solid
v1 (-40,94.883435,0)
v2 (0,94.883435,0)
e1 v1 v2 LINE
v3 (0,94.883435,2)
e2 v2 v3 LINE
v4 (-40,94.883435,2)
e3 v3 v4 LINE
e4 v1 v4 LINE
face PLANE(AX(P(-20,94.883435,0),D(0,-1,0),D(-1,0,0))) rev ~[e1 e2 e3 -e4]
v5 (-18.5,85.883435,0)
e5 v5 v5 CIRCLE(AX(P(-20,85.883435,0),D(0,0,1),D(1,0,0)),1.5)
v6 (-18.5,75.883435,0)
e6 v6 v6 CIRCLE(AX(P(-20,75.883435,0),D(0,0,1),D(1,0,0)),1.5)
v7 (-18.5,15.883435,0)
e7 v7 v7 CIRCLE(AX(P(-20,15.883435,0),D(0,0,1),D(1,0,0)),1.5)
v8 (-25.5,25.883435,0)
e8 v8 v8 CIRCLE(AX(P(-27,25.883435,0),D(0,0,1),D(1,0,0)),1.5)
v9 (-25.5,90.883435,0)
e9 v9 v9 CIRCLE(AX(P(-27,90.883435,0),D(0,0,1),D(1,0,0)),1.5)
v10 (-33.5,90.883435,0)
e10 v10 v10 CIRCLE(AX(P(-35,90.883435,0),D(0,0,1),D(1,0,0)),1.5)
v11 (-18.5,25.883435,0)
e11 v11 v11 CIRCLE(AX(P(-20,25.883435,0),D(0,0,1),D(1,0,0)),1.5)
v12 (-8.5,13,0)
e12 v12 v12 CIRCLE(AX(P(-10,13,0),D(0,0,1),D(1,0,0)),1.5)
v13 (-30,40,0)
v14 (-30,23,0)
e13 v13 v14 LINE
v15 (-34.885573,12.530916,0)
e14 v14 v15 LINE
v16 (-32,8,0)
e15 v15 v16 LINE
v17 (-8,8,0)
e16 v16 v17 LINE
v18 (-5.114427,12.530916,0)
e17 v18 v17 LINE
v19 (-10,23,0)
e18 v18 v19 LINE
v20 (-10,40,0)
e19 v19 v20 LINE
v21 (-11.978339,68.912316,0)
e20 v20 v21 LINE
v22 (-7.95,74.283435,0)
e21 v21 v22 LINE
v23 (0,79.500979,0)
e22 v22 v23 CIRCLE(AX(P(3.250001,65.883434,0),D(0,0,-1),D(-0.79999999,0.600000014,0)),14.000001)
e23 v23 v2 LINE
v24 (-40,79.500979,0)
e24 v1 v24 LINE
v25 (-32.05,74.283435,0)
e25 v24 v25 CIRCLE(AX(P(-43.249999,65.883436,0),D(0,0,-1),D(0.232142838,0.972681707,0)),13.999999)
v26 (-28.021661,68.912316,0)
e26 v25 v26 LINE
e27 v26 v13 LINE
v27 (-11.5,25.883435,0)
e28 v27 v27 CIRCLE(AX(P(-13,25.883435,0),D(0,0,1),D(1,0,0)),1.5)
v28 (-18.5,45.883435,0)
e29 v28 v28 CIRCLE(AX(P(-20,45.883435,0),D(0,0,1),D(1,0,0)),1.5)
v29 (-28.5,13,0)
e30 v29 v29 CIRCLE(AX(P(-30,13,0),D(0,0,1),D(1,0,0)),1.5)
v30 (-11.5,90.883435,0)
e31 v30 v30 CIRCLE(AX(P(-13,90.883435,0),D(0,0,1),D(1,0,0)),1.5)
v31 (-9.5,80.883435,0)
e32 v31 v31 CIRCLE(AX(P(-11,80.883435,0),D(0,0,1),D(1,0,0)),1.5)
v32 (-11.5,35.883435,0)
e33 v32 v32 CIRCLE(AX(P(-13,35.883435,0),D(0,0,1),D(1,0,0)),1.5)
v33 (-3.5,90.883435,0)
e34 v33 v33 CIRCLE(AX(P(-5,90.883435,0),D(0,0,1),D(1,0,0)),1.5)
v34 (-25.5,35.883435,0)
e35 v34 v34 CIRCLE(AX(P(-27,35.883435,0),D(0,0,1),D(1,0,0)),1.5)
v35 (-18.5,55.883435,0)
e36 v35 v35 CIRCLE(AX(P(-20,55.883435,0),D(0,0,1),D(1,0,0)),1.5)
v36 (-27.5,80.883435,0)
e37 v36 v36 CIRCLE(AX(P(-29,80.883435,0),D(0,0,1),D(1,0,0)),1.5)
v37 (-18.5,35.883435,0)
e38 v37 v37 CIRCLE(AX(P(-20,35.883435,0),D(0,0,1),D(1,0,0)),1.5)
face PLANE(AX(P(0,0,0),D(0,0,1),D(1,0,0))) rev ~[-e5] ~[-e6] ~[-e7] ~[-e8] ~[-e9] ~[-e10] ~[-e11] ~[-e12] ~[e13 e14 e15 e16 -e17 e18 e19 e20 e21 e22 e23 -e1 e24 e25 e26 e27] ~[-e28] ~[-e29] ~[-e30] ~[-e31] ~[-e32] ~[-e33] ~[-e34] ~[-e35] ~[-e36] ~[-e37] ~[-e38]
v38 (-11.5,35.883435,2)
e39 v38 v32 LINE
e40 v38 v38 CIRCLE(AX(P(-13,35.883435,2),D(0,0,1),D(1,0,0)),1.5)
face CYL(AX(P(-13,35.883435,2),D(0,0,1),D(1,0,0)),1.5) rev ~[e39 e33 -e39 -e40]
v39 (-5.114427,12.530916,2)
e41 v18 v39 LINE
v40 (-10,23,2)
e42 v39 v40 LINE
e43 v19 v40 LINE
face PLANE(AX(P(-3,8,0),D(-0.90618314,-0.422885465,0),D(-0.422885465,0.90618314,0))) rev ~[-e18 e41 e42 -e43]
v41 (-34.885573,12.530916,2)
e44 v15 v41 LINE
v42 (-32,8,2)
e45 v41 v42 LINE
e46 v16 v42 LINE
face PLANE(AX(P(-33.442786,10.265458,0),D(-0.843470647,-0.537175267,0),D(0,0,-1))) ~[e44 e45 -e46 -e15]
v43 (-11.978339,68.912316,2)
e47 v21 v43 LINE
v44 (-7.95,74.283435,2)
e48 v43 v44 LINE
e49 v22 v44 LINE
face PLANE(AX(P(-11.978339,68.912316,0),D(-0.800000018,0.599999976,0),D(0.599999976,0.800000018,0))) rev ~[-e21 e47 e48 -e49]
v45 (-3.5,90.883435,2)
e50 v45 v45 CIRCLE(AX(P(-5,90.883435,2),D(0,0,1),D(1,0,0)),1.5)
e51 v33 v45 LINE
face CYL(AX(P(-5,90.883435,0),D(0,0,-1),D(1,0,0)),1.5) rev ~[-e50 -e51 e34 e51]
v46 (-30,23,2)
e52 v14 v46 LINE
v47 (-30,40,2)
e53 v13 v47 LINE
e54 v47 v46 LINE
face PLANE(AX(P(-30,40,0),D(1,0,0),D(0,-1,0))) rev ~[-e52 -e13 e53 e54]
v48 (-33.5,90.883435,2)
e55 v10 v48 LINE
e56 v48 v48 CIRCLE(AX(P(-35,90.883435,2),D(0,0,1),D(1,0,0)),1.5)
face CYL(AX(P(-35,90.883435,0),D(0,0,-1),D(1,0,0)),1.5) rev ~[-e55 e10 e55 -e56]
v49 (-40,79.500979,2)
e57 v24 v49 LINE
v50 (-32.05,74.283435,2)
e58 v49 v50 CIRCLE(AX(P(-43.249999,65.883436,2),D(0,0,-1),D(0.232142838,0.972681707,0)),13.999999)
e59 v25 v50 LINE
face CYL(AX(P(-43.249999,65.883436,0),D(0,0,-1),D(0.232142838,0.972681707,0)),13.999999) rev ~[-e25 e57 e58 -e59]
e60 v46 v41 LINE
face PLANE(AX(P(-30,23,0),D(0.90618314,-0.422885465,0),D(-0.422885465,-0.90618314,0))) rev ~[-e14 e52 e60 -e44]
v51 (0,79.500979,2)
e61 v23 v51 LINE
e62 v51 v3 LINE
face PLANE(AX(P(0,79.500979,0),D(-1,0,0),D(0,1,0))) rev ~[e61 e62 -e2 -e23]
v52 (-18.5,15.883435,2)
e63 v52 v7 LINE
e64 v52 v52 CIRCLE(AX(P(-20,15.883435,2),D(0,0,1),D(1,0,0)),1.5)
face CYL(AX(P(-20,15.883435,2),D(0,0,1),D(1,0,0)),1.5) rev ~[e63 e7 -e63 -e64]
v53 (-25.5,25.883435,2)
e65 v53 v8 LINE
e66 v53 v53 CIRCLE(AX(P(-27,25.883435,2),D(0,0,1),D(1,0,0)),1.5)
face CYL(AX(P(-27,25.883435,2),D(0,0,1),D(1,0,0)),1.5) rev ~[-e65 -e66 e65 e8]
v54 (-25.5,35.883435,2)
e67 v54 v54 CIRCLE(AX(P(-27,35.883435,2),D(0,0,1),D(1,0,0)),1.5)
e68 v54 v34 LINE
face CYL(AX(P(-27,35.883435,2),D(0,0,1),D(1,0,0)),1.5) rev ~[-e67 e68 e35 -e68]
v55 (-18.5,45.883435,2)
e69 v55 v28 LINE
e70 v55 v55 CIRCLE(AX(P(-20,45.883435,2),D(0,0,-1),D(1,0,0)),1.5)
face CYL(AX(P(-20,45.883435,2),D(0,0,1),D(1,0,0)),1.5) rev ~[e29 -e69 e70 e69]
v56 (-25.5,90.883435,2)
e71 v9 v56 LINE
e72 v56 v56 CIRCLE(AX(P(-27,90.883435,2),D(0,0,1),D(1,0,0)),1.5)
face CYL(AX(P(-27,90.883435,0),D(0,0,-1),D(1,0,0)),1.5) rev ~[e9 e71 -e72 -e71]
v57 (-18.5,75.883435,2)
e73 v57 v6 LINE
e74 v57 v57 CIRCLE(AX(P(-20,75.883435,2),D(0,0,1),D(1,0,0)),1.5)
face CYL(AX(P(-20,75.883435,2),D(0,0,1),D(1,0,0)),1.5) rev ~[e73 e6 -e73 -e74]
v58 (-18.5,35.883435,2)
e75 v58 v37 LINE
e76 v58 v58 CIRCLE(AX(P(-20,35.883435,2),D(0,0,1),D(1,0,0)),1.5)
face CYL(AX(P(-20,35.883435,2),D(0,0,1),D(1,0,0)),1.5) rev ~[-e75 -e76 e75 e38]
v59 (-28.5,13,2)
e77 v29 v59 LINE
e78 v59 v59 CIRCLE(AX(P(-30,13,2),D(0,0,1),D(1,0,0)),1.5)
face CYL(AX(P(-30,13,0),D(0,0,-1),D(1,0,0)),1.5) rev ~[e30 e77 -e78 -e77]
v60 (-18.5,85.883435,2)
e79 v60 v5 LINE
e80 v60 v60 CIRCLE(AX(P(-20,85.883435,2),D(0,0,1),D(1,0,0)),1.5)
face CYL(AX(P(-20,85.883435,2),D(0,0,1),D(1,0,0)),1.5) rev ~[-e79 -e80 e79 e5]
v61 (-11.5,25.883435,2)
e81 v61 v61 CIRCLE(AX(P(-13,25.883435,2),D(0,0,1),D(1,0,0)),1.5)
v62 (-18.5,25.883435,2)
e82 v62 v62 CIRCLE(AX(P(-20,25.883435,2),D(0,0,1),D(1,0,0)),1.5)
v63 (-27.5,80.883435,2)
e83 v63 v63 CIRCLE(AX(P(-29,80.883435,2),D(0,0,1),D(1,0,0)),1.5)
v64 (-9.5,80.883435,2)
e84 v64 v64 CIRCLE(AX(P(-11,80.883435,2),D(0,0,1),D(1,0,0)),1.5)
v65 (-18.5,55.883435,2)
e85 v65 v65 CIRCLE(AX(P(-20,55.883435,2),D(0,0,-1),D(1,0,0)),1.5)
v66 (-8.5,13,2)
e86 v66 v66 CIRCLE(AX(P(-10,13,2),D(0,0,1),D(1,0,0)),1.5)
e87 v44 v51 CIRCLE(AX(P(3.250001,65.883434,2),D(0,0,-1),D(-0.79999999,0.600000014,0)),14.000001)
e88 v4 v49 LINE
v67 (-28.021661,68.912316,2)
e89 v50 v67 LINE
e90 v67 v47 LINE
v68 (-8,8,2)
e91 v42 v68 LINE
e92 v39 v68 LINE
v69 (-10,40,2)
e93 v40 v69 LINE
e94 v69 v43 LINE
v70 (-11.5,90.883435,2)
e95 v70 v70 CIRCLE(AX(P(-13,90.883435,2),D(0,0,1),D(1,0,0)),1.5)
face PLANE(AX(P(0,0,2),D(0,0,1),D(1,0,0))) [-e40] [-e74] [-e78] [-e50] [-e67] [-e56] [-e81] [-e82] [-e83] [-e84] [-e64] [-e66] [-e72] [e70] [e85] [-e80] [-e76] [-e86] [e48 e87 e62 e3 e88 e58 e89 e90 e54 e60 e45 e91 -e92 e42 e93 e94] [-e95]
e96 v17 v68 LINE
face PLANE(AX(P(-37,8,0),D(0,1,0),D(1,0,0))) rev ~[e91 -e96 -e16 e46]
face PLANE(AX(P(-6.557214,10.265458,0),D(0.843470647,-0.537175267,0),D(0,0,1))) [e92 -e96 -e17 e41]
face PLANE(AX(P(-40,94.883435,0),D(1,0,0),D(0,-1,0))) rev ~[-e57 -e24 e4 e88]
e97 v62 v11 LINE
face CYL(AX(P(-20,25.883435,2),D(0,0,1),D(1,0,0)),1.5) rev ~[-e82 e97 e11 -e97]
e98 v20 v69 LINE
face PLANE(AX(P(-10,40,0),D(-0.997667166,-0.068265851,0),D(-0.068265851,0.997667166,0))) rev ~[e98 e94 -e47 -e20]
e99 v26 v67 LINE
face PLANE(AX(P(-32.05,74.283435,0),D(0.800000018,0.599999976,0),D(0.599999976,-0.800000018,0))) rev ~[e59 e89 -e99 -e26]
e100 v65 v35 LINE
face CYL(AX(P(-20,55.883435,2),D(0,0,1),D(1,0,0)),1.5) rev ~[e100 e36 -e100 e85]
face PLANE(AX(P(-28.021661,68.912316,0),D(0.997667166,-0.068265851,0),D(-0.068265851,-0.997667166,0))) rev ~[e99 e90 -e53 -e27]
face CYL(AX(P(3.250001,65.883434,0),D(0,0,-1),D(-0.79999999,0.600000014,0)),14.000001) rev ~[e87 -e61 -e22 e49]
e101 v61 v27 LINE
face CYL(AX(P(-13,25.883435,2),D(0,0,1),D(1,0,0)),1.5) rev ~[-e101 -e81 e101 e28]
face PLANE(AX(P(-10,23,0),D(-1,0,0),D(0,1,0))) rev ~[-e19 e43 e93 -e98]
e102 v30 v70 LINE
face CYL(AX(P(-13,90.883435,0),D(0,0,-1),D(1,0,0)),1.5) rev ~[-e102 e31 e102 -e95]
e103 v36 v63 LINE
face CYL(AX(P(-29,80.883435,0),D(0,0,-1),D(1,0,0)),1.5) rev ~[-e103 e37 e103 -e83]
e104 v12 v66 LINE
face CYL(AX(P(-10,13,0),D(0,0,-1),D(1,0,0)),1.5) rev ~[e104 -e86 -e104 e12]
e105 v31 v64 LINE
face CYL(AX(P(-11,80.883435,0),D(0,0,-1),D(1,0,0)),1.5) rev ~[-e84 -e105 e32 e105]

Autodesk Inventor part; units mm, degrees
ref_plane "YZ Plane" through (0, 0, 0) normal (1, 0, 0) x (0, 1, 0)
ref_plane "XZ Plane" through (0, 0, 0) normal (0, 1, 0) x (-1, 0, 0)
ref_plane "XY Plane" through (0, 0, 0) normal (0, 0, 1) x (1, 0, 0)
sketch "Sketch1" plane through (0, 0, 0) normal (0, 0, 1) x (1, 0, 0)
  circle A0 centre (-34, 4) radius 1.5
  circle A1 centre (-30, 13) radius 1.5
  circle A2 centre (-27, 4) radius 1.5
  line L0 (-30, 23) -> (-30, 40)
  line L1 (-39.076923, 9.384615) -> (-30, 23)
  line L2 (-40, 0) -> (-40, 8)
  line L3 (-40, 0) -> (-20, 0)
  line L4 (-20, 0) -> (-20, 40)
  line L5 (-20, 40) -> (-30, 40)
  circle A3 centre (-6, 4) radius 1.5
  circle A4 centre (-10, 13) radius 1.5
  circle A5 centre (-13, 4) radius 1.5
  line L6 (-10, 23) -> (-10, 40)
  line L7 (-20, 40) -> (-10, 40)
  line L8 (-20, 0) -> (-20, 40)
  line L9 (0, 0) -> (-20, 0)
  line L10 (0, 0) -> (0, 8)
  line L11 (-0.923077, 9.384615) -> (-10, 23)
  line L12 (-3, 8) -> (-37, 8)
  circle A6 centre (-29, 80.883435) radius 1.5
  circle A7 centre (-27, 90.883435) radius 1.5
  circle A8 centre (-35, 90.883435) radius 1.5
  line L13 (-40, 79.500979) -> (-40, 94.883435)
  arc A9 (-32.05, 74.283435) -> (-40, 79.500979) centre (-43.25, 65.883435) ccw
  line L14 (-28.021661, 68.912316) -> (-32.05, 74.283435)
  line L15 (-20, 68.912316) -> (-28.021661, 68.912316)
  line L16 (-20, 94.883435) -> (-20, 68.912316)
  line L17 (-40, 94.883435) -> (-20, 94.883435)
  circle A10 centre (-11, 80.883435) radius 1.5
  circle A11 centre (-13, 90.883435) radius 1.5
  circle A12 centre (-5, 90.883435) radius 1.5
  line L18 (0, 79.500979) -> (0, 94.883435)
  line L19 (0, 94.883435) -> (-20, 94.883435)
  line L20 (-20, 94.883435) -> (-20, 68.912316)
  line L21 (-20, 68.912316) -> (-11.978339, 68.912316)
  line L22 (-11.978339, 68.912316) -> (-7.95, 74.283435)
  arc A13 (0, 79.500979) -> (-7.95, 74.283435) centre (3.25, 65.883435) ccw
  line L23 (-10, 40) -> (-11.978339, 68.912316)
  line L24 (-28.021661, 68.912316) -> (-30, 40)
sketch "Sketch1 outline for Extrusion1" plane through (0, 0, 0) normal (0, 0, 1) x (1, 0, 0)
  line L0 (-37, 8) -> (-3, 8)
  line L1 (-30, 23) -> (-37, 8)
  line L2 (-3, 8) -> (-10, 23)
  line L3 (-30, 40) -> (-30, 23)
  line L4 (-10, 23) -> (-10, 40)
  line L5 (-28.021661, 68.912316) -> (-30, 40)
  line L6 (-10, 40) -> (-11.978339, 68.912316)
  line L7 (-32.05, 74.283435) -> (-28.021661, 68.912316)
  line L8 (-11.978339, 68.912316) -> (-7.95, 74.283435)
  arc A0 (-40, 79.500979) -> (-32.05, 74.283435) centre (-43.25, 65.883435) cw
  arc A1 (-7.95, 74.283435) -> (0, 79.500979) centre (3.25, 65.883435) cw
  line L9 (-40, 94.883435) -> (-40, 79.500979)
  line L10 (0, 79.500979) -> (0, 94.883435)
  line L11 (-20, 94.883435) -> (-40, 94.883435)
  line L12 (0, 94.883435) -> (-20, 94.883435)
  circle A2 centre (-30, 13) radius 1.5
  circle A3 centre (-10, 13) radius 1.5
  circle A4 centre (-29, 80.883435) radius 1.5
  circle A5 centre (-35, 90.883435) radius 1.5
  circle A6 centre (-27, 90.883435) radius 1.5
  circle A7 centre (-13, 90.883435) radius 1.5
  circle A8 centre (-11, 80.883435) radius 1.5
  circle A9 centre (-5, 90.883435) radius 1.5
extrude "Extrusion1" add sketch "Sketch1 outline for Extrusion1" along normal blind 2
chamfer "Chamfer1" distance 5 angle 45 2 edges at (-37, 8, 1) (-3, 8, 1)
sketch "Sketch2" plane through (0, 0, 2) normal (0, 0, 1) x (1, 0, 0)
  circle A0 centre (-27, 35.883435) radius 1.5
  circle A1 centre (-13, 35.883435) radius 1.5
  circle A2 centre (-13, 25.883435) radius 1.5
  circle A3 centre (-27, 25.883435) radius 1.5
  circle A4 centre (-20, 75.883435) radius 1.5
  circle A5 centre (-20, 25.883435) radius 1.5
  circle A6 centre (-20, 15.883435) radius 1.5
  circle A7 centre (-20, 35.883435) radius 1.5
  circle A8 centre (-20, 85.883435) radius 1.5
  line L0 (-5, 8) -> (-2.773501, 12.160251)
  line L1 (-5, 8) -> (-35, 8)
  line L2 (-37.226499, 12.160251) -> (-35, 8)
  line L3 (-37.226499, 12.160251) -> (-30, 23)
  line L4 (-30, 23) -> (-30, 40)
  line L5 (-30, 40) -> (-26, 40)
  arc A9 (-26, 40) -> (-23, 43) centre (-26, 43) ccw
  line L6 (-23, 43) -> (-23, 65.912316)
  arc A10 (-23, 65.912316) -> (-26, 68.912316) centre (-26, 65.912316) ccw
  line L7 (-26, 68.912316) -> (-28.021661, 68.912316)
  line L8 (-28.021661, 68.912316) -> (-32.05, 74.283435)
  arc A11 (-32.05, 74.283435) -> (-40, 79.500979) centre (-43.25, 65.883435) ccw
  line L9 (-40, 79.500979) -> (-40, 94.883435)
  line L10 (-40, 94.883435) -> (0, 94.883435)
  line L11 (0, 94.883435) -> (0, 79.500979)
  arc A12 (0, 79.500979) -> (-7.95, 74.283435) centre (3.25, 65.883435) ccw
  line L12 (-7.95, 74.283435) -> (-11.978339, 68.912316)
  line L13 (-11.978339, 68.912316) -> (-14, 68.912316)
  arc A13 (-14, 68.912316) -> (-17, 65.912316) centre (-14, 65.912316) ccw
  line L14 (-17, 65.912316) -> (-17, 43)
  arc A14 (-17, 43) -> (-14, 40) centre (-14, 43) ccw
  line L15 (-14, 40) -> (-10, 40)
  line L16 (-10, 40) -> (-10, 23)
  line L17 (-10, 23) -> (-2.773501, 12.160251)
  circle A15 centre (-30, 13) radius 1.5
  circle A16 centre (-27, 90.883435) radius 1.5
  circle A17 centre (-29, 80.883435) radius 1.5
  circle A18 centre (-35, 90.883435) radius 1.5
  circle A19 centre (-11, 80.883435) radius 1.5
  circle A20 centre (-13, 90.883435) radius 1.5
  circle A21 centre (-5, 90.883435) radius 1.5
  circle A22 centre (-10, 13) radius 1.5
  point P0 (0, 0)
extrude "Extrusion2" cut sketch "Sketch2" against normal blind 10 contours A0 | A1 | A2 | A3 | A4 | A5 | A6 | A7 | A8
sketch "Sketch3" plane through (0, 0, 2) normal (0, 0, 1) x (1, 0, 0)
  circle A0 centre (-13, 35.883435) radius 1.5
  circle A1 centre (-20, 35.883435) radius 1.5
  circle A2 centre (-27, 35.883435) radius 1.5
  circle A3 centre (-13, 25.883435) radius 1.5
  circle A4 centre (-20, 75.883435) radius 1.5
  circle A5 centre (-20, 25.883435) radius 1.5
  circle A6 centre (-27, 25.883435) radius 1.5
  circle A7 centre (-20, 15.883435) radius 1.5
  circle A8 centre (-20, 85.883435) radius 1.5
  line L0 (-5.114427, 12.530916) -> (-8, 8)
  line L1 (-5.114427, 12.530916) -> (-10, 23)
  line L2 (-10, 23) -> (-10, 40)
  line L3 (-10, 40) -> (-11.978339, 68.912316)
  line L4 (-11.978339, 68.912316) -> (-7.95, 74.283435)
  arc A9 (0, 79.500979) -> (-7.95, 74.283435) centre (3.25, 65.883435) ccw
  line L5 (0, 79.500979) -> (0, 94.883435)
  line L6 (0, 94.883435) -> (-40, 94.883435)
  line L7 (-40, 94.883435) -> (-40, 79.500979)
  arc A10 (-32.05, 74.283435) -> (-40, 79.500979) centre (-43.25, 65.883435) ccw
  line L8 (-32.05, 74.283435) -> (-28.021661, 68.912316)
  line L9 (-28.021661, 68.912316) -> (-30, 40)
  line L10 (-30, 40) -> (-30, 23)
  line L11 (-30, 23) -> (-34.885573, 12.530916)
  line L12 (-32, 8) -> (-34.885573, 12.530916)
  line L13 (-32, 8) -> (-8, 8)
  circle A11 centre (-13, 90.883435) radius 1.5
  circle A12 centre (-11, 80.883435) radius 1.5
  circle A13 centre (-5, 90.883435) radius 1.5
  circle A14 centre (-29, 80.883435) radius 1.5
  circle A15 centre (-27, 90.883435) radius 1.5
  circle A16 centre (-35, 90.883435) radius 1.5
  circle A17 centre (-30, 13) radius 1.5
  circle A18 centre (-10, 13) radius 1.5
  circle A19 centre (-20, 75.883435) radius 1.5
  line L14 (-20, 75.883435) -> (-20, 55.883435)
  line L15 (-20, 55.883435) -> (-20, 45.883435)
  circle A20 centre (-20, 55.883435) radius 1.5
  circle A21 centre (-20, 45.883435) radius 1.5
  point P0 (0, 0)
  dimension "d7" = 20
  dimension "d8" = 10
  dimension "d9" = 3
  dimension "d10" = 3
extrude "Extrusion3" cut sketch "Sketch3" against normal blind 10 contours A20 L15 L14 | L14 L15 A20 | A21
properties part number "body_bone_3"
